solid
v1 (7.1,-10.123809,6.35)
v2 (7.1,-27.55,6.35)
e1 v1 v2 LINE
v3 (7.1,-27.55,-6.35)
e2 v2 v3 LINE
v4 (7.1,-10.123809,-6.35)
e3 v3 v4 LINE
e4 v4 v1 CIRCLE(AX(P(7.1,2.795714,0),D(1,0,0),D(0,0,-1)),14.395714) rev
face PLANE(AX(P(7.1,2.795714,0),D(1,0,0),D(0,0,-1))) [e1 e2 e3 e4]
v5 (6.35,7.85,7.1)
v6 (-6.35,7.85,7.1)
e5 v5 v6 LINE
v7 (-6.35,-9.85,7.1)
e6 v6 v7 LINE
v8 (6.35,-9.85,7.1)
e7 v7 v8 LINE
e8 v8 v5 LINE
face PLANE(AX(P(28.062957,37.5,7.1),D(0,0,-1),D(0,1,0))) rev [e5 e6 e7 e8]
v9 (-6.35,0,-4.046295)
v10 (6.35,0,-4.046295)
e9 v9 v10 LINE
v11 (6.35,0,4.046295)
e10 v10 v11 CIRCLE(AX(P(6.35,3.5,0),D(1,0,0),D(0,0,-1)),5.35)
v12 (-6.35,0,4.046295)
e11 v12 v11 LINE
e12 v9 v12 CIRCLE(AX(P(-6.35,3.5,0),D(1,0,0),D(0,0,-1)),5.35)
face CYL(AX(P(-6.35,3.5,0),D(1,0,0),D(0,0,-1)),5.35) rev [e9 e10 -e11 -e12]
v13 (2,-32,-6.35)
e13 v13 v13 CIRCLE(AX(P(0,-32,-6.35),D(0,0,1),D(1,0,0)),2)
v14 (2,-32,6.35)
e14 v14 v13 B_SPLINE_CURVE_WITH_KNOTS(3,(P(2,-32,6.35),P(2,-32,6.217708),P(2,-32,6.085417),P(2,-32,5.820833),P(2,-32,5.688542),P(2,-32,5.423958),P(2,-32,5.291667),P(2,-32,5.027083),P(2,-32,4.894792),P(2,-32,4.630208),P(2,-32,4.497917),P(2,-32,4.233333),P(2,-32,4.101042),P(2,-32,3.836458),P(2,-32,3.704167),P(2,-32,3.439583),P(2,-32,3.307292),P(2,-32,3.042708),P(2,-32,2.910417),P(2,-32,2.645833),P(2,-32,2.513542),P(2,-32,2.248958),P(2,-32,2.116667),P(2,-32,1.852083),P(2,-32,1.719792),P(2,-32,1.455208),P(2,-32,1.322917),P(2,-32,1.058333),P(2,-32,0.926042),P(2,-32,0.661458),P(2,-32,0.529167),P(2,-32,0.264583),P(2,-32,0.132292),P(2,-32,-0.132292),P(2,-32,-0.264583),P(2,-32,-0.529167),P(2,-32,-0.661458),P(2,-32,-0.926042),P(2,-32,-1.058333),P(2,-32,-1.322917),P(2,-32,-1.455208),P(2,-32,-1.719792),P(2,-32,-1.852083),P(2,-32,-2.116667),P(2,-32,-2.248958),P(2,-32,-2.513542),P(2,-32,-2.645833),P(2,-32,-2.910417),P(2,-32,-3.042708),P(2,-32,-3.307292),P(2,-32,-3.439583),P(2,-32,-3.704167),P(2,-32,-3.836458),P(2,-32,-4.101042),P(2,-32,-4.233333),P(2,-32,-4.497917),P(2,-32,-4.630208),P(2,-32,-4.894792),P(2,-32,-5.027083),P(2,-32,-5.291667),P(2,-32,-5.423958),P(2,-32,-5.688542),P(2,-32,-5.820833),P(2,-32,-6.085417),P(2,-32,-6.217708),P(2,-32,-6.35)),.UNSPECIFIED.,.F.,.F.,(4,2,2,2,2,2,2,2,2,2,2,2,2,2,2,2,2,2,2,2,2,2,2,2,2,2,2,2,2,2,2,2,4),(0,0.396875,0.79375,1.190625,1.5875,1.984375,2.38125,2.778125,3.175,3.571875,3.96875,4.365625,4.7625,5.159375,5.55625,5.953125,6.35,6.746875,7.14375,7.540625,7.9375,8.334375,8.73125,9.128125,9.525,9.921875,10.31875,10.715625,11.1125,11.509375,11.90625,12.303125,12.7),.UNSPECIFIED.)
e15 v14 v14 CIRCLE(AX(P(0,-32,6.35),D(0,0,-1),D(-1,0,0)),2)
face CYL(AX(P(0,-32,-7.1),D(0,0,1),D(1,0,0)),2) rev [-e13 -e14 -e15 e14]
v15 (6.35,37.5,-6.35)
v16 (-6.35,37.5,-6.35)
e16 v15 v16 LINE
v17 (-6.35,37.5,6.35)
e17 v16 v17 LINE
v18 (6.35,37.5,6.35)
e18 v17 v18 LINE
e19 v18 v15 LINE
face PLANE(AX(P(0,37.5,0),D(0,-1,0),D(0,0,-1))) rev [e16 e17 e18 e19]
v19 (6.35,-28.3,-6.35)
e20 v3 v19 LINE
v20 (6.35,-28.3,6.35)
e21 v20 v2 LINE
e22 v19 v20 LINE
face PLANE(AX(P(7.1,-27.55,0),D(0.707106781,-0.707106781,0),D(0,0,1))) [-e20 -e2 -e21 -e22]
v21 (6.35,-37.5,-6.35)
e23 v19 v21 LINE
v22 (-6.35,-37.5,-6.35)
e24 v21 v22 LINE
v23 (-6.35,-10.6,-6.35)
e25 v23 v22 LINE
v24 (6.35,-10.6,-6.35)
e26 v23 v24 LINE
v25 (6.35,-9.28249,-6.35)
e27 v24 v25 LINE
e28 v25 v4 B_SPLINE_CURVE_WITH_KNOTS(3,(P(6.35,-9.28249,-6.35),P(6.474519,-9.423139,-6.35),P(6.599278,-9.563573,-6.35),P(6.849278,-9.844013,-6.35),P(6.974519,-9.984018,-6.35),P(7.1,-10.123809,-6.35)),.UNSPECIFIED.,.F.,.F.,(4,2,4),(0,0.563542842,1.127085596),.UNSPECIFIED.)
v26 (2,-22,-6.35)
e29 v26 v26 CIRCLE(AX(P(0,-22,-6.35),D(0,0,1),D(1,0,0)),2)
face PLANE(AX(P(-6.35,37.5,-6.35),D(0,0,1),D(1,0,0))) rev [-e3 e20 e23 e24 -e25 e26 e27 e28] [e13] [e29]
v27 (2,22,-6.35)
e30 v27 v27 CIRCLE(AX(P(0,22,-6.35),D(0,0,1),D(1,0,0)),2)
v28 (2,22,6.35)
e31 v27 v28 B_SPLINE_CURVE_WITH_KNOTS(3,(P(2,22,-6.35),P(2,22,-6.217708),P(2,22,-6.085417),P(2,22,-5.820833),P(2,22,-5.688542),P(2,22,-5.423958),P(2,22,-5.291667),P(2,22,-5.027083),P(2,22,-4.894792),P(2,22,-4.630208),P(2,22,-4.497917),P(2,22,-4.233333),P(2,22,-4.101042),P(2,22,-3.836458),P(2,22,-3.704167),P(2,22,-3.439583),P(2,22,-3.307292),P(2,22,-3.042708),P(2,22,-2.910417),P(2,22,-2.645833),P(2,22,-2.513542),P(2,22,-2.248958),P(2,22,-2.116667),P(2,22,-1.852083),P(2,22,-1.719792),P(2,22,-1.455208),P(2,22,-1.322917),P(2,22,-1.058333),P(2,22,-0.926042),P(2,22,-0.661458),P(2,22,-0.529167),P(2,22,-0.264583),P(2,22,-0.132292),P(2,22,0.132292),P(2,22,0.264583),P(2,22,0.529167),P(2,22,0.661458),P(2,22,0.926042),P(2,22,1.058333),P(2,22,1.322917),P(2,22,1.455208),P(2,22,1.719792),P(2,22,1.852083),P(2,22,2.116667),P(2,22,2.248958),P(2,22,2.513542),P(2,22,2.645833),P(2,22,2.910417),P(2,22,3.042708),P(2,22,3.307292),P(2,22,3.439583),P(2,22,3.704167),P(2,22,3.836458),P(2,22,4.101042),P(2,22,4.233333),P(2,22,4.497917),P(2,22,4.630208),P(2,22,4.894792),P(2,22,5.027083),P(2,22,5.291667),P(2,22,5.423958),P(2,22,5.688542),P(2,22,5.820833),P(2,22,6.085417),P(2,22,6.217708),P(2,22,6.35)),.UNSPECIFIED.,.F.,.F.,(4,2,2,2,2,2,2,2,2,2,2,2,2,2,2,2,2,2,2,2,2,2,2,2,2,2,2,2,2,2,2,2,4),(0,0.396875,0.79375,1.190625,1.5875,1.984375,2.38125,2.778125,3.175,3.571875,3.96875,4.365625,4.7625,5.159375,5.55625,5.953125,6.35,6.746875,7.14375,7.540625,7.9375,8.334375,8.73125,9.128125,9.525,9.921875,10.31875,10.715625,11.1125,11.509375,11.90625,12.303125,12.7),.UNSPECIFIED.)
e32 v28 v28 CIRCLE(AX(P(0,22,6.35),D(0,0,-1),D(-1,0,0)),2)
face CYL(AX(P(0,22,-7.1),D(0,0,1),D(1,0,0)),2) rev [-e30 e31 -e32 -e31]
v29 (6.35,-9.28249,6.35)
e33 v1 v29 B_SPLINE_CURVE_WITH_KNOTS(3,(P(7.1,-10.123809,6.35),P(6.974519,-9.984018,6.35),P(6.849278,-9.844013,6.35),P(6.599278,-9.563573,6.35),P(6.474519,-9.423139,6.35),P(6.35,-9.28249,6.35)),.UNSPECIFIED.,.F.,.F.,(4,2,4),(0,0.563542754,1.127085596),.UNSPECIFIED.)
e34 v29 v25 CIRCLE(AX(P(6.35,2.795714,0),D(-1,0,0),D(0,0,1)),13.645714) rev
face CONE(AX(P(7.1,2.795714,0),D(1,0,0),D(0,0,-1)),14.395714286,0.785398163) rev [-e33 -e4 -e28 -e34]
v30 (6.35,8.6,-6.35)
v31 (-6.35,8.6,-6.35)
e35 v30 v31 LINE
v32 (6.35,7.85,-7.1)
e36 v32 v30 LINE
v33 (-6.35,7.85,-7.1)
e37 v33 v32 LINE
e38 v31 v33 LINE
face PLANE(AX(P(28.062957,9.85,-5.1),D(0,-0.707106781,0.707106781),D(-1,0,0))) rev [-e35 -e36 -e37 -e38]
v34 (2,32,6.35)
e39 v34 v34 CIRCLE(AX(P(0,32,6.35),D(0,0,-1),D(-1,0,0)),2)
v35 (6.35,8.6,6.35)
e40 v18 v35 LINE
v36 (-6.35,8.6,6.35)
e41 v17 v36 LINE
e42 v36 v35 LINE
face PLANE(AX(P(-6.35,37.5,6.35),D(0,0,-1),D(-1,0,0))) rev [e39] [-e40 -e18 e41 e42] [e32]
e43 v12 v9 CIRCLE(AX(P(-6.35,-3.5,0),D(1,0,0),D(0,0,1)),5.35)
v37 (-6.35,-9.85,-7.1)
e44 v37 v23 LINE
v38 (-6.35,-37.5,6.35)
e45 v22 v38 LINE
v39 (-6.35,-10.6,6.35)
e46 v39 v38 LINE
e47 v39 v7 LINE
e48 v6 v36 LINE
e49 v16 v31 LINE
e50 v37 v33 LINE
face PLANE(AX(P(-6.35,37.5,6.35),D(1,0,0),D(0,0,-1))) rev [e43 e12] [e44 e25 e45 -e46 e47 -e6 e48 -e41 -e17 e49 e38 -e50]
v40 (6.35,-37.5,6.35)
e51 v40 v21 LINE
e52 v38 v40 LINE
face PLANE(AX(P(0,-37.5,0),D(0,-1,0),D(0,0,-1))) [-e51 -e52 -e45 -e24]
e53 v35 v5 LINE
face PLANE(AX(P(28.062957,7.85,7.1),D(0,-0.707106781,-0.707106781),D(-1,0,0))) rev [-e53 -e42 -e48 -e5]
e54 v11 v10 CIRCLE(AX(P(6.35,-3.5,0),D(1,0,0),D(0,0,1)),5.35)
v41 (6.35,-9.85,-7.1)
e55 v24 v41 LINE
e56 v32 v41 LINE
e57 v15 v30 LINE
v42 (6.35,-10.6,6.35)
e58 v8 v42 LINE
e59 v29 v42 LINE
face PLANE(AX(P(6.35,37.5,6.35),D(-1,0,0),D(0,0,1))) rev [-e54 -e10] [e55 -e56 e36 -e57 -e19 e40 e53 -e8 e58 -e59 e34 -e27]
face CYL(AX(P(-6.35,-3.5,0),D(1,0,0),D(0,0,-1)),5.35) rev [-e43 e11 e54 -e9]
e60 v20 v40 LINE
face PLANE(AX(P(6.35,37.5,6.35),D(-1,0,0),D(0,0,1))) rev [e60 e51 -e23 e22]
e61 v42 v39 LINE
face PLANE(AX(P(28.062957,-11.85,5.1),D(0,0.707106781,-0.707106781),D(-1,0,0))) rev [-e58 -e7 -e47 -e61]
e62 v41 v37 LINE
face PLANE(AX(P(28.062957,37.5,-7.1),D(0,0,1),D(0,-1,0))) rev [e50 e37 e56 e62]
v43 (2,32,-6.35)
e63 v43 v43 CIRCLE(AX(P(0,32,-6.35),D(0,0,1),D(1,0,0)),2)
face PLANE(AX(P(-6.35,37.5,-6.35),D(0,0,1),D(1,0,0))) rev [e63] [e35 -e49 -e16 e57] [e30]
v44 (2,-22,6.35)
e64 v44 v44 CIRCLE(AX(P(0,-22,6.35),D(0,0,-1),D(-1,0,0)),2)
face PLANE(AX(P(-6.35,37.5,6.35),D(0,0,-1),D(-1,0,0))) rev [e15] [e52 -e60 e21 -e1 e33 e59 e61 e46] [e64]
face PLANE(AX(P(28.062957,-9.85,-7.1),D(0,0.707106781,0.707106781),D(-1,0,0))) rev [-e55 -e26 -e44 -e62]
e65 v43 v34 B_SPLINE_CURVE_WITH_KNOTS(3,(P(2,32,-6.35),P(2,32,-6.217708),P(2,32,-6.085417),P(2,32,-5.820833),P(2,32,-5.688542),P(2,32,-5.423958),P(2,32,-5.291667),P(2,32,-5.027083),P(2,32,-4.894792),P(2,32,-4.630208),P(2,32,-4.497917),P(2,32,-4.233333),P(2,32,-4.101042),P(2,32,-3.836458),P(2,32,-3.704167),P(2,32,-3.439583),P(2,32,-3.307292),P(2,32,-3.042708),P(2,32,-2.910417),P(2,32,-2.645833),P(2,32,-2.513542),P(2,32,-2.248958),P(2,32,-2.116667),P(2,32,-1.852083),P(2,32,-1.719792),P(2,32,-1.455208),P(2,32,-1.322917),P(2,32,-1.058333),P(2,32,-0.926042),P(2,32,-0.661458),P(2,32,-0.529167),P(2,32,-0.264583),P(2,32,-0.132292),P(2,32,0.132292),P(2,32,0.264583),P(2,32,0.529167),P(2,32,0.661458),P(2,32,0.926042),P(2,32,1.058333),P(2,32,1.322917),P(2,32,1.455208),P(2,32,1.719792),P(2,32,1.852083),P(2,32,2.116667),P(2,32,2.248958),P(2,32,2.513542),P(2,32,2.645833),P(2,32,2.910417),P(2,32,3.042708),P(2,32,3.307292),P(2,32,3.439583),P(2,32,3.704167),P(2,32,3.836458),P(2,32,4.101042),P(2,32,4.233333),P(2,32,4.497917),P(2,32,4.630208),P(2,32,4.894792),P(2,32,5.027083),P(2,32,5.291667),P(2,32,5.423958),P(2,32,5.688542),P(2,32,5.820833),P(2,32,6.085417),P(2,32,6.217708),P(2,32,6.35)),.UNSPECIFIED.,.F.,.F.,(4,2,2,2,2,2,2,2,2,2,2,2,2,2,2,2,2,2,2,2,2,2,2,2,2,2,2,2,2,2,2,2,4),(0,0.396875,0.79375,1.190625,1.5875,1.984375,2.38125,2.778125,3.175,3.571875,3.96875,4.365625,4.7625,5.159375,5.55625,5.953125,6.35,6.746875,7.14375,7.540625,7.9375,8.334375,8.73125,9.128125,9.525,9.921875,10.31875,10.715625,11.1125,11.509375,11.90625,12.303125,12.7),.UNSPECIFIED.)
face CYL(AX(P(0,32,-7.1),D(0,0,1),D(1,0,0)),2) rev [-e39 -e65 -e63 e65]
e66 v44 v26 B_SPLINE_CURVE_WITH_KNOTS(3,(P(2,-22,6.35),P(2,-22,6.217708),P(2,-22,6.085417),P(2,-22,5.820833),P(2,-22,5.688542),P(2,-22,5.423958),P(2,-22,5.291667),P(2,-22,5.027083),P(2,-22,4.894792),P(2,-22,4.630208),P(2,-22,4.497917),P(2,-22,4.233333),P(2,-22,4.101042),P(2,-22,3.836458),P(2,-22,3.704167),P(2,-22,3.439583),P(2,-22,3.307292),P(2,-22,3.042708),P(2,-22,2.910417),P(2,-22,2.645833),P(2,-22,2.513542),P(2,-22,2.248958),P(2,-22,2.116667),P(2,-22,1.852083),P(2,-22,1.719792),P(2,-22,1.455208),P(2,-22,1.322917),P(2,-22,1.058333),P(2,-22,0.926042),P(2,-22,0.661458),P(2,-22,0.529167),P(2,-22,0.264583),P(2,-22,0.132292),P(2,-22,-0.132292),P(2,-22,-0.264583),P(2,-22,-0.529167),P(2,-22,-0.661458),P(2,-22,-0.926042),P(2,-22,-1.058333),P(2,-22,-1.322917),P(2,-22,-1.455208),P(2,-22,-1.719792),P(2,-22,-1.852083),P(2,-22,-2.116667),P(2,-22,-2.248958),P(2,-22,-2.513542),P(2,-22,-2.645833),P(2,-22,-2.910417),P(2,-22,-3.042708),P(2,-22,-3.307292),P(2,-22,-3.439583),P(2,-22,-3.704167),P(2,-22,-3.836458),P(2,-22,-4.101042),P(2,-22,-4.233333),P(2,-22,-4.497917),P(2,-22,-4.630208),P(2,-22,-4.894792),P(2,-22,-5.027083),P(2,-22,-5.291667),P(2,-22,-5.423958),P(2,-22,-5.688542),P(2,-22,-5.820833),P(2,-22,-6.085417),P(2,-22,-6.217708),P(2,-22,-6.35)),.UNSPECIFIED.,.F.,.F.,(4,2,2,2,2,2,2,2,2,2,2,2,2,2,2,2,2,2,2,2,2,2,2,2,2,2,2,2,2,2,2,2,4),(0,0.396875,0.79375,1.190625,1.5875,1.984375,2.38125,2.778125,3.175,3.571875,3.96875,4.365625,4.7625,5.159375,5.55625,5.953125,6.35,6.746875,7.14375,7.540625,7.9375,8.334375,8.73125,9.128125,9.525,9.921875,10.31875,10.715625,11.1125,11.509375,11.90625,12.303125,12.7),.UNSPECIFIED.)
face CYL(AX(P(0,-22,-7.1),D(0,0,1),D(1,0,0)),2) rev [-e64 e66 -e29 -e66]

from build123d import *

# Parameters (mm, degrees)
SKETCH1_W               = 12.7
SKETCH1_H               = 12.7
BOSS_EXTRUDE1_DEPTH     = 37.5
CUT_EXTRUDE1_DEPTH      = 39.560277489
CUT_EXTRUDE1_DEPTH_BACK = 39.560277489
BOSS_EXTRUDE2_START     = -6.35
SKETCH3_W               = 0.75
SKETCH3_H               = 21.7
BOSS_EXTRUDE2_DEPTH     = 12.7
BOSS_EXTRUDE3_DEPTH     = 0.75
CHAMFER1_SIZE           = 2
CUT_EXTRUDE2_DEPTH      = 39.820999472
CUT_EXTRUDE2_DEPTH_BACK = 39.820999472
SKETCH5_R               = 2


with BuildPart() as part:
    # Sketch1 → Boss-Extrude1 (new, symmetric)
    with BuildSketch(Plane(origin=(0, 0, 0), x_dir=(1, 0, 0), z_dir=(0, 1, 0))):
        Rectangle(SKETCH1_W, SKETCH1_H)
    extrude(amount=BOSS_EXTRUDE1_DEPTH, both=True)

    # Sketch2 → Cut-Extrude1 (cut, two sides: drawn at the far end of the back side and taken through both)
    with BuildSketch(Plane(origin=(0, 0, 0), x_dir=(0, 0, -1), z_dir=(1, 0, 0)).offset(-CUT_EXTRUDE1_DEPTH_BACK)):
        with BuildLine():
            ThreePointArc((4.046294601, 0), (0, 8.85), (-4.046294601, 0))
            ThreePointArc((-4.046294601, 0), (0, -8.85), (4.046294601, 0))
        make_face()
    extrude(amount=CUT_EXTRUDE1_DEPTH + CUT_EXTRUDE1_DEPTH_BACK, mode=Mode.SUBTRACT)

    # Sketch3 → Boss-Extrude2 (add)
    with BuildSketch(Plane(origin=(0, 0, 0), x_dir=(0, 0, -1), z_dir=(1, 0, 0)).offset(BOSS_EXTRUDE2_START)):
        with Locations((6.725, -1)):
            Rectangle(SKETCH3_W, SKETCH3_H)
        with Locations((-6.725, -1)):
            Rectangle(SKETCH3_W, SKETCH3_H)
    extrude(amount=BOSS_EXTRUDE2_DEPTH)

    # Sketch4 → Boss-Extrude3 (add)
    with BuildSketch(Plane(origin=(6.35, 0, 0), x_dir=(0, 0, -1), z_dir=(1, 0, 0))):
        with BuildLine():
            Line((-6.35, -7.85), (-6.35, -29.55))
            Line((-6.35, -29.55), (6.35, -29.55))
            Line((6.35, -29.55), (6.35, -7.85))
            ThreePointArc((6.35, -7.85), (0, -9.6), (-6.35, -7.85))
        make_face()
    extrude(amount=BOSS_EXTRUDE3_DEPTH)

    # Chamfer1
    # the kernel refuses this chamfer: 2 mm, written as the material it takes off along each edge
    with BuildSketch(Plane(origin=(7.1, -29.55, 11.493365976), x_dir=(-0.9996219169112968, -0.027495876610585623, 0), z_dir=(0, 0, -1))) as chamfer1_piece_1_section:
        Polygon((CHAMFER1_SIZE * 0.999621916911, CHAMFER1_SIZE * 0.0274958766106), (-CHAMFER1_SIZE * 0.0274958766106, CHAMFER1_SIZE * 0.999621916911), (0, 0), align=None)
    chamfer1_piece_1 = extrude(amount=22.986731952, mode=Mode.PRIVATE)
    chamfer1_piece_1 = split(chamfer1_piece_1, bisect_by=Plane(origin=(6.35, -28.711332072, 0), z_dir=(1, 0, 0)), keep=Keep.TOP, mode=Mode.PRIVATE)
    add(chamfer1_piece_1, mode=Mode.SUBTRACT)
    with BuildSketch(Plane(origin=(7.1, 2.795714286, 0), x_dir=(0, -0.5793710900712427, -0.8150638870601863), z_dir=(0, 0.8150638870601863, -0.5793710900712427))) as chamfer1_piece_2_section:
        Polygon((12.395714286, CHAMFER1_SIZE), (12.395714286 + CHAMFER1_SIZE, 0), (12.395714286, 0), align=None)
    chamfer1_piece_2 = revolve(axis=Axis((7.1, 2.795714286, 0), (-1, 0, 0)), revolution_arc=109.187358772, mode=Mode.PRIVATE)
    chamfer1_piece_2 = split(chamfer1_piece_2, bisect_by=Plane(origin=(6.35, -11.230390822, 0), z_dir=(1, 0, 0)), keep=Keep.TOP, mode=Mode.PRIVATE)
    add(chamfer1_piece_2, mode=Mode.SUBTRACT)
    with BuildSketch(Plane(origin=(-11.493365976, -11.85, -7.1), x_dir=(0, 0.9996219169112968, -0.027495876610586487), z_dir=(1, 0, 0))) as chamfer1_piece_3_section:
        Polygon((CHAMFER1_SIZE * 0.999621916911, CHAMFER1_SIZE * 0.0274958766106), (-CHAMFER1_SIZE * 0.0274958766106, CHAMFER1_SIZE * 0.999621916911), (0, 0), align=None)
    chamfer1_piece_3 = extrude(amount=22.986731952, mode=Mode.PRIVATE)
    chamfer1_piece_3 = split(chamfer1_piece_3, bisect_by=Plane(origin=(0, -11.011332072, -6.35), z_dir=(0, 0, -1)), keep=Keep.TOP, mode=Mode.PRIVATE)
    add(chamfer1_piece_3, mode=Mode.SUBTRACT)
    with BuildSketch(Plane(origin=(-11.493365976, 9.85, -7.1), x_dir=(0, 0.027495876610586487, 0.9996219169112968), z_dir=(1, 0, 0))) as chamfer1_piece_4_section:
        Polygon((CHAMFER1_SIZE * 0.999621916911, CHAMFER1_SIZE * 0.0274958766106), (-CHAMFER1_SIZE * 0.0274958766106, CHAMFER1_SIZE * 0.999621916911), (0, 0), align=None)
    chamfer1_piece_4 = extrude(amount=22.986731952, mode=Mode.PRIVATE)
    chamfer1_piece_4 = split(chamfer1_piece_4, bisect_by=Plane(origin=(0, 9.011332072, -6.35), z_dir=(0, 0, -1)), keep=Keep.TOP, mode=Mode.PRIVATE)
    add(chamfer1_piece_4, mode=Mode.SUBTRACT)
    with BuildSketch(Plane(origin=(-11.493365976, 9.85, 7.1), x_dir=(0, -0.9996219169112968, 0.027495876610586497), z_dir=(1, 0, 0))) as chamfer1_piece_5_section:
        Polygon((CHAMFER1_SIZE * 0.999621916911, CHAMFER1_SIZE * 0.0274958766106), (-CHAMFER1_SIZE * 0.0274958766106, CHAMFER1_SIZE * 0.999621916911), (0, 0), align=None)
    chamfer1_piece_5 = extrude(amount=22.986731952, mode=Mode.PRIVATE)
    chamfer1_piece_5 = split(chamfer1_piece_5, bisect_by=Plane(origin=(0, 9.011332072, 6.35), z_dir=(0, 0, 1)), keep=Keep.TOP, mode=Mode.PRIVATE)
    add(chamfer1_piece_5, mode=Mode.SUBTRACT)
    with BuildSketch(Plane(origin=(-11.493365976, -11.85, 7.1), x_dir=(0, -0.027495876610586487, -0.9996219169112968), z_dir=(1, 0, 0))) as chamfer1_piece_6_section:
        Polygon((CHAMFER1_SIZE * 0.999621916911, CHAMFER1_SIZE * 0.0274958766106), (-CHAMFER1_SIZE * 0.0274958766106, CHAMFER1_SIZE * 0.999621916911), (0, 0), align=None)
    chamfer1_piece_6 = extrude(amount=22.986731952, mode=Mode.PRIVATE)
    chamfer1_piece_6 = split(chamfer1_piece_6, bisect_by=Plane(origin=(0, -11.011332072, 6.35), z_dir=(0, 0, 1)), keep=Keep.TOP, mode=Mode.PRIVATE)
    add(chamfer1_piece_6, mode=Mode.SUBTRACT)

    # Sketch5 → Cut-Extrude2 (cut, two sides: drawn at the far end of the back side and taken through both)
    with BuildSketch(Plane.XY.offset(-CUT_EXTRUDE2_DEPTH_BACK)):
        with Locations((0, 32)):
            Circle(SKETCH5_R)
        with Locations((0, 22)):
            Circle(SKETCH5_R)
        with Locations((0, -32)):
            Circle(SKETCH5_R)
        with Locations((0, -22)):
            Circle(SKETCH5_R)
    extrude(amount=CUT_EXTRUDE2_DEPTH + CUT_EXTRUDE2_DEPTH_BACK, mode=Mode.SUBTRACT)


solid = part.part
